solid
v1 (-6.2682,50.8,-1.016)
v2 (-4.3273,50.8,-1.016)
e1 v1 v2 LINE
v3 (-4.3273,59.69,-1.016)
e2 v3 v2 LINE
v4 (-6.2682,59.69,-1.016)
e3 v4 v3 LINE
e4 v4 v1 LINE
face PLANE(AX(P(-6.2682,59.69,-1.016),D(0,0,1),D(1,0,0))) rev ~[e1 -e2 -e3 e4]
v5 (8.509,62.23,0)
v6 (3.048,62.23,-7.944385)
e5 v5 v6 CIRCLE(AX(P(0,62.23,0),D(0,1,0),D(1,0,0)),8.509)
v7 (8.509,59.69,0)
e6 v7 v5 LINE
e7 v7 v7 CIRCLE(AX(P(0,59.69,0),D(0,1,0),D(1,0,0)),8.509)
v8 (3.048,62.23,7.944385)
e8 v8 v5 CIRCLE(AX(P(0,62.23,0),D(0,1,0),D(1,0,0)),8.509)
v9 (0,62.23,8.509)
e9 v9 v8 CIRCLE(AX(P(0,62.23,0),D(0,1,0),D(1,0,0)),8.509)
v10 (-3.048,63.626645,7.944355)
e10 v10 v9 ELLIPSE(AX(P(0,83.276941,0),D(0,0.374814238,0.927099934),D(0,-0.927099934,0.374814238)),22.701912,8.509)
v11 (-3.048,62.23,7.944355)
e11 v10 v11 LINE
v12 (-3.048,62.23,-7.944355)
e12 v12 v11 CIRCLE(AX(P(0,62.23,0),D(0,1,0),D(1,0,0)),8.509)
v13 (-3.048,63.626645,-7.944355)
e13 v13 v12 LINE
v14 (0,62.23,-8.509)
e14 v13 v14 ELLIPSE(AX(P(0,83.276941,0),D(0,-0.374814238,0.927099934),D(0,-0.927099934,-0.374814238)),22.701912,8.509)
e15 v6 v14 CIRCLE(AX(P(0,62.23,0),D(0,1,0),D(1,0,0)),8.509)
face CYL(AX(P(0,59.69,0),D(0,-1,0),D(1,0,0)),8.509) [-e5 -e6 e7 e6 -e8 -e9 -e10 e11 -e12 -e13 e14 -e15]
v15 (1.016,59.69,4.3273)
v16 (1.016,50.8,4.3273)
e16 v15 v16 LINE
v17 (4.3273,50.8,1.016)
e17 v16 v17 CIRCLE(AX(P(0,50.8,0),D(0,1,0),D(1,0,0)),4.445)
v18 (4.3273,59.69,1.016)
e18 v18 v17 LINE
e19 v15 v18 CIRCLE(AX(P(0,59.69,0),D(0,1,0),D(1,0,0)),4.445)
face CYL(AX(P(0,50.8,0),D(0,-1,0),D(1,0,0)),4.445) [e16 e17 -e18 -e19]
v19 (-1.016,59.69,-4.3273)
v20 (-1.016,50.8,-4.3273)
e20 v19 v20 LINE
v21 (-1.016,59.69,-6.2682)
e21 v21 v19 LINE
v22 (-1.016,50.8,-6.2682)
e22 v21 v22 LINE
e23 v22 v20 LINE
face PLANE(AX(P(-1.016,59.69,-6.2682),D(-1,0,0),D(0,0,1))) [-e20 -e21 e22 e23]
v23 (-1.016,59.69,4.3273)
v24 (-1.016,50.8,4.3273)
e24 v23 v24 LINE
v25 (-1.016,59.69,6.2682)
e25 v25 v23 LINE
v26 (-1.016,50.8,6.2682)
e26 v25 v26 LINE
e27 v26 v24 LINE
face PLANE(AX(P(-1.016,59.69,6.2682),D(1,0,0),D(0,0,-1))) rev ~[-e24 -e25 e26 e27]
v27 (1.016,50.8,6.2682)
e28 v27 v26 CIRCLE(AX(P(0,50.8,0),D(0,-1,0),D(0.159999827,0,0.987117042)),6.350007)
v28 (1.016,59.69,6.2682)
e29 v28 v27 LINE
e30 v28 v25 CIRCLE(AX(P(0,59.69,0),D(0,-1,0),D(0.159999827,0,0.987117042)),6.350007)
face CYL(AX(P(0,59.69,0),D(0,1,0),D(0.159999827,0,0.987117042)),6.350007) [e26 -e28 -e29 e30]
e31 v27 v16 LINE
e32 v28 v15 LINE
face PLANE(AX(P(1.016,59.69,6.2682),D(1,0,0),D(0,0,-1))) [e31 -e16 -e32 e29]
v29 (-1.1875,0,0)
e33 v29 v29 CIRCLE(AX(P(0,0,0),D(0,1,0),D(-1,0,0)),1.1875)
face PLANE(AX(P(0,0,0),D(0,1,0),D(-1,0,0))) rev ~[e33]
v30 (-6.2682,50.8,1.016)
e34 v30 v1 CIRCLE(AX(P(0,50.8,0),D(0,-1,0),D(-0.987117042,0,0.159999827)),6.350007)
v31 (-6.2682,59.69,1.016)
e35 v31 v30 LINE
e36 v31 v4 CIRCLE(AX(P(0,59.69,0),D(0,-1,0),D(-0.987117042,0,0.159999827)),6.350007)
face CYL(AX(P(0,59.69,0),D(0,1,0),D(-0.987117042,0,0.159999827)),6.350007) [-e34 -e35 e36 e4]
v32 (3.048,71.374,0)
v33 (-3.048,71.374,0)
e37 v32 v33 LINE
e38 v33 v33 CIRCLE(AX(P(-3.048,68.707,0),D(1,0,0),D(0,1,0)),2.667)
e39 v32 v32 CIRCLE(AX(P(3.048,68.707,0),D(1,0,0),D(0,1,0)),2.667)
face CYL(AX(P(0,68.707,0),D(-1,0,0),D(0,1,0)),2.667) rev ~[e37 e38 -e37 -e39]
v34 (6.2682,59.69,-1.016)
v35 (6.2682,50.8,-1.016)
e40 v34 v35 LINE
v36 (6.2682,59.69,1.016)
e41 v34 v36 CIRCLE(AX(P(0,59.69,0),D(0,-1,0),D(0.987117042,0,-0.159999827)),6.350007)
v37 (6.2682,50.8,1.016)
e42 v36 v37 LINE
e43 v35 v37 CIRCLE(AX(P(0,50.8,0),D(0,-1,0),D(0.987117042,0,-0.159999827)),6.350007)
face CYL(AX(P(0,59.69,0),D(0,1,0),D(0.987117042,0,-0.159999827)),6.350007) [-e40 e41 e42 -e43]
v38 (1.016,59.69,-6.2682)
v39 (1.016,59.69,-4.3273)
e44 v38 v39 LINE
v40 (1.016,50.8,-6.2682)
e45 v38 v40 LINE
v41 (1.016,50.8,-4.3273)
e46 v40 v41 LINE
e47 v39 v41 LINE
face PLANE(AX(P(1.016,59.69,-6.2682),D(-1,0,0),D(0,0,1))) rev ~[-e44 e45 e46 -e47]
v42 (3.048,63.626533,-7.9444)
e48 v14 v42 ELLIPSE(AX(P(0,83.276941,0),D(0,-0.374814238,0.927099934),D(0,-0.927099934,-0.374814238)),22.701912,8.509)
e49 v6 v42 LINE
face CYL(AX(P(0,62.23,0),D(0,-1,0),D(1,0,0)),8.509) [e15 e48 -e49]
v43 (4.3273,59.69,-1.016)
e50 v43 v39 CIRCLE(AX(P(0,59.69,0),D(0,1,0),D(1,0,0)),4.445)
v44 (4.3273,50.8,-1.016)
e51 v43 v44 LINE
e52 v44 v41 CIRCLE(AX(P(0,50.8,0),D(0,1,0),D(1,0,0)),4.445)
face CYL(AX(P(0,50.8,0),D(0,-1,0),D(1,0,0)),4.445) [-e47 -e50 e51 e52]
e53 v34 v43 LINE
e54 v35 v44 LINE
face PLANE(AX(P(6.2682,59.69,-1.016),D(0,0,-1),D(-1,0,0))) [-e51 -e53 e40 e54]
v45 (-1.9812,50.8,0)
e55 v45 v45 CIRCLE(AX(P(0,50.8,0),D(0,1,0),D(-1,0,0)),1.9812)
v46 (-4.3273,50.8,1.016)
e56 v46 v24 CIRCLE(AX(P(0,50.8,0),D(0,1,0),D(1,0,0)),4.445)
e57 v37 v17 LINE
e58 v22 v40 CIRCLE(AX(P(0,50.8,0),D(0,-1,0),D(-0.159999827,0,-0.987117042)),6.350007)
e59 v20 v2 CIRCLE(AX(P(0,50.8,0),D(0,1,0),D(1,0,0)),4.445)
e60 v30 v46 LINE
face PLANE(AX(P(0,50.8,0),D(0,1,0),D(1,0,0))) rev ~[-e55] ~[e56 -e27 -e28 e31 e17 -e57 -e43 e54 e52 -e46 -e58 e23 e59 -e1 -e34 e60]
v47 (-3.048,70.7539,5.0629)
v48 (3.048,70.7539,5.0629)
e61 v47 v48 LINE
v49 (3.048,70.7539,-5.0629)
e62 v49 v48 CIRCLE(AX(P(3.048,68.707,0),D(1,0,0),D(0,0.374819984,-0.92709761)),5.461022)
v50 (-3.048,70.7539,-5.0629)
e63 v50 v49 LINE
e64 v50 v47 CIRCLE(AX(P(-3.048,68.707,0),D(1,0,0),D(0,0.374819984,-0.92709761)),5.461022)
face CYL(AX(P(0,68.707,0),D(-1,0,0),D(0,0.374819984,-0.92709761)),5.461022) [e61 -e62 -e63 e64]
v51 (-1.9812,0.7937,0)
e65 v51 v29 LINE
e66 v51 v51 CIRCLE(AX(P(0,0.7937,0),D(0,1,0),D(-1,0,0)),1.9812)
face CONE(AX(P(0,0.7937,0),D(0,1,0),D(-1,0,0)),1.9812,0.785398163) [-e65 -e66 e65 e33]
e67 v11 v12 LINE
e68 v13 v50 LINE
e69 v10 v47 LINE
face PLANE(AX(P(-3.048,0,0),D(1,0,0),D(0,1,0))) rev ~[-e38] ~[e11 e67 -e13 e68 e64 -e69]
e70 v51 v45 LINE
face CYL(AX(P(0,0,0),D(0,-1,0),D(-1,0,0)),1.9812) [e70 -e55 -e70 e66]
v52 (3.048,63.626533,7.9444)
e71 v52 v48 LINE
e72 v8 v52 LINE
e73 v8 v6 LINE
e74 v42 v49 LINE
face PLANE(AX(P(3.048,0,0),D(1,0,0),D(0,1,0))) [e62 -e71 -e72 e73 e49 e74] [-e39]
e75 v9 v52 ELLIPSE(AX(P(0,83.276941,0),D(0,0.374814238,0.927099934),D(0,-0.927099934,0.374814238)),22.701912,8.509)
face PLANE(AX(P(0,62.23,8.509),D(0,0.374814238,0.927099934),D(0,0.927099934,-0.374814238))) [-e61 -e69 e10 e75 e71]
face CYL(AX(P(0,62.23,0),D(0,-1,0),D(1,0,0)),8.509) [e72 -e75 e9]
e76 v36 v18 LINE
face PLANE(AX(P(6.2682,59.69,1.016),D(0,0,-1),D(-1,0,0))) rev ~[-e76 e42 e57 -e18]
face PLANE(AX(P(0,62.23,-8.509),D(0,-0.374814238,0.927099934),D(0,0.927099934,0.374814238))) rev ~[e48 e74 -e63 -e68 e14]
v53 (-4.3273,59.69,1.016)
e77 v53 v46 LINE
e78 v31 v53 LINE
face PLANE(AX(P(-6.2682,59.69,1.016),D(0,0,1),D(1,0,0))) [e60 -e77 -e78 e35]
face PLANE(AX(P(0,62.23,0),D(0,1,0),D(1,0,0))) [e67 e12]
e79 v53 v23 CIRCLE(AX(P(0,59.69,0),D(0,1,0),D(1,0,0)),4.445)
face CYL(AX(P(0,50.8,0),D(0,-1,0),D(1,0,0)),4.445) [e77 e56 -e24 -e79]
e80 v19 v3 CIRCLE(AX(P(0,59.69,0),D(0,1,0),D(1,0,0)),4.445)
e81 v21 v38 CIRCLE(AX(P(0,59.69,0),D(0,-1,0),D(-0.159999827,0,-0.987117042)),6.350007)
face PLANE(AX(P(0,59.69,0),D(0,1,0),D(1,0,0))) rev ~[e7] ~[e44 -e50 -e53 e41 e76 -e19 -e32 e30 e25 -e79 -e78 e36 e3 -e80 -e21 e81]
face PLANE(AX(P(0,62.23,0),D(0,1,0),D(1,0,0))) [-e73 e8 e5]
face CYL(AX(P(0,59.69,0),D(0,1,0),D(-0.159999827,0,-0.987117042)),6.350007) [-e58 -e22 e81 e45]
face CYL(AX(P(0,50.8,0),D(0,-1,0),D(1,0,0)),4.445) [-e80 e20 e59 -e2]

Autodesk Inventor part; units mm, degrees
ref_plane "YZ Plane" through (0, 0, 0) normal (1, 0, 0) x (0, 1, 0)
ref_plane "XZ Plane" through (0, 0, 0) normal (0, 1, 0) x (-1, 0, 0)
sketch "Sketch2" plane through (0, 0, 0) normal (0, 1, 0) x (-1, 0, 0)
  circle A0 centre (0, 0) radius 1.9812
  dimension "d0" = 3.9624
extrude "Extrusion1" add sketch "Sketch2" along normal blind 50.8
chamfer "Chamfer1" distance 0.7937 angle 45 1 edges at (1.9812, 0, 0)
sketch "Sketch3" plane through (0, 50.8, 0) normal (0, 1, 0) x (1, 0, 0)
  circle A0 centre (0, 0) radius 1.9812 projected
  circle A1 centre (0, 0) radius 4.445
  dimension "d6" = 8.89
extrude "Extrusion2" add sketch "Sketch3" along normal blind 8.89 contours A0 | A1
sketch "Sketch4" plane through (0, 59.69, 0) normal (0, 1, 0) x (1, 0, 0)
  circle A0 centre (0, 0) radius 4.445 projected
  circle A1 centre (0, 0) radius 8.509
  dimension "d9" = 17.018
extrude "Extrusion3" add sketch "Sketch4" along normal blind 2.54 contours A0 | A1
sketch "Sketch5" plane through (0, 0, 0) normal (1, 0, 0) x (0, 1, 0)
  circle A0 centre (68.707, 0) radius 2.667
  arc A1 (70.7539, -5.0629) -> (70.7539, 5.0629) centre (68.707, 0) ccw
  line L0 (59.69, 8.509) -> (62.23, 8.509) projected
  line L1 (62.23, 8.509) -> (62.23, -8.509) projected
  line L2 (59.69, -8.509) -> (62.23, -8.509) projected
  line L3 (62.23, 8.509) -> (62.23, -8.509)
  line L4 (62.23, -8.509) -> (70.7539, -5.0629)
  line L5 (62.23, 8.509) -> (70.7539, 5.0629)
  line L6 (37.7029, 0) -> (42.6845, 0) construction
  line L7 (74.168, 5.5293) -> (74.168, -0.3965) construction
  point P0 (0, 0)
  dimension "d12" = 5.334
  dimension "d13" = 10.922
  dimension "d14" = 11.938
extrude "Extrusion4" add sketch "Sketch5" along normal mid plane 6.096
sketch "Sketch6" plane through (0, 62.23, 0) normal (0, 1, 0) x (1, 0, 0)
  arc A0 (3.048, -7.9444) -> (3.048, 7.9444) centre (0, 0) ccw projected
  circle A1 centre (0, 0) radius 8.509
  circle A2 centre (0, 0) radius 9.0384
  point P0 (-3.048, 8.509)
extrude "Extrusion5" cut sketch "Sketch6" along normal blind 12.7
sketch "Sketch7" plane through (0, 59.69, 0) normal (0, -1, 0) x (1, 0, 0)
  circle A0 centre (0, 0) radius 8.509 projected
  circle A1 centre (0, 0) radius 4.445 projected
  arc A2 (-4.3273, 1.016) -> (-4.3273, -1.016) centre (0, 0) ccw
  circle A3 centre (0, 0) radius 4.445 projected
  arc A4 (-6.2682, 1.016) -> (-6.2682, -1.016) centre (0, 0) ccw
  line L0 (-6.2682, 1.016) -> (-4.3273, 1.016)
  line L1 (-6.2682, -1.016) -> (-4.3273, -1.016)
  arc A5 (-1.016, -4.3273) -> (1.016, -4.3273) centre (0, 0) ccw
  arc A6 (-1.016, -6.2682) -> (1.016, -6.2682) centre (0, 0) ccw
  line L2 (-1.016, -6.2682) -> (-1.016, -4.3273)
  line L3 (1.016, -6.2682) -> (1.016, -4.3273)
  arc A7 (4.3273, -1.016) -> (4.3273, 1.016) centre (0, 0) ccw
  arc A8 (6.2682, -1.016) -> (6.2682, 1.016) centre (0, 0) ccw
  line L4 (6.2682, -1.016) -> (4.3273, -1.016)
  line L5 (6.2682, 1.016) -> (4.3273, 1.016)
  arc A9 (1.016, 4.3273) -> (-1.016, 4.3273) centre (0, 0) ccw
  arc A10 (1.016, 6.2682) -> (-1.016, 6.2682) centre (0, 0) ccw
  line L6 (1.016, 6.2682) -> (1.016, 4.3273)
  line L7 (-1.016, 6.2682) -> (-1.016, 4.3273)
  dimension "d19" = 12.7
  dimension "d20" = 2.032
  dimension "d21" = 1.016
  dimension "d24" = 360
extrude "Extrusion6" add sketch "Sketch7" along normal blind 8.89 contours A1 L5 A8 L4 | A1 L7 A10 L6 | L3 A6 L2 A1 | A1 L1 A4 L0
ref_plane "Work Plane1" through (0, 74.168, 0) normal (0, 1, 0) x (-1, 0, 0)
properties part number "Shock Mount - Top"
